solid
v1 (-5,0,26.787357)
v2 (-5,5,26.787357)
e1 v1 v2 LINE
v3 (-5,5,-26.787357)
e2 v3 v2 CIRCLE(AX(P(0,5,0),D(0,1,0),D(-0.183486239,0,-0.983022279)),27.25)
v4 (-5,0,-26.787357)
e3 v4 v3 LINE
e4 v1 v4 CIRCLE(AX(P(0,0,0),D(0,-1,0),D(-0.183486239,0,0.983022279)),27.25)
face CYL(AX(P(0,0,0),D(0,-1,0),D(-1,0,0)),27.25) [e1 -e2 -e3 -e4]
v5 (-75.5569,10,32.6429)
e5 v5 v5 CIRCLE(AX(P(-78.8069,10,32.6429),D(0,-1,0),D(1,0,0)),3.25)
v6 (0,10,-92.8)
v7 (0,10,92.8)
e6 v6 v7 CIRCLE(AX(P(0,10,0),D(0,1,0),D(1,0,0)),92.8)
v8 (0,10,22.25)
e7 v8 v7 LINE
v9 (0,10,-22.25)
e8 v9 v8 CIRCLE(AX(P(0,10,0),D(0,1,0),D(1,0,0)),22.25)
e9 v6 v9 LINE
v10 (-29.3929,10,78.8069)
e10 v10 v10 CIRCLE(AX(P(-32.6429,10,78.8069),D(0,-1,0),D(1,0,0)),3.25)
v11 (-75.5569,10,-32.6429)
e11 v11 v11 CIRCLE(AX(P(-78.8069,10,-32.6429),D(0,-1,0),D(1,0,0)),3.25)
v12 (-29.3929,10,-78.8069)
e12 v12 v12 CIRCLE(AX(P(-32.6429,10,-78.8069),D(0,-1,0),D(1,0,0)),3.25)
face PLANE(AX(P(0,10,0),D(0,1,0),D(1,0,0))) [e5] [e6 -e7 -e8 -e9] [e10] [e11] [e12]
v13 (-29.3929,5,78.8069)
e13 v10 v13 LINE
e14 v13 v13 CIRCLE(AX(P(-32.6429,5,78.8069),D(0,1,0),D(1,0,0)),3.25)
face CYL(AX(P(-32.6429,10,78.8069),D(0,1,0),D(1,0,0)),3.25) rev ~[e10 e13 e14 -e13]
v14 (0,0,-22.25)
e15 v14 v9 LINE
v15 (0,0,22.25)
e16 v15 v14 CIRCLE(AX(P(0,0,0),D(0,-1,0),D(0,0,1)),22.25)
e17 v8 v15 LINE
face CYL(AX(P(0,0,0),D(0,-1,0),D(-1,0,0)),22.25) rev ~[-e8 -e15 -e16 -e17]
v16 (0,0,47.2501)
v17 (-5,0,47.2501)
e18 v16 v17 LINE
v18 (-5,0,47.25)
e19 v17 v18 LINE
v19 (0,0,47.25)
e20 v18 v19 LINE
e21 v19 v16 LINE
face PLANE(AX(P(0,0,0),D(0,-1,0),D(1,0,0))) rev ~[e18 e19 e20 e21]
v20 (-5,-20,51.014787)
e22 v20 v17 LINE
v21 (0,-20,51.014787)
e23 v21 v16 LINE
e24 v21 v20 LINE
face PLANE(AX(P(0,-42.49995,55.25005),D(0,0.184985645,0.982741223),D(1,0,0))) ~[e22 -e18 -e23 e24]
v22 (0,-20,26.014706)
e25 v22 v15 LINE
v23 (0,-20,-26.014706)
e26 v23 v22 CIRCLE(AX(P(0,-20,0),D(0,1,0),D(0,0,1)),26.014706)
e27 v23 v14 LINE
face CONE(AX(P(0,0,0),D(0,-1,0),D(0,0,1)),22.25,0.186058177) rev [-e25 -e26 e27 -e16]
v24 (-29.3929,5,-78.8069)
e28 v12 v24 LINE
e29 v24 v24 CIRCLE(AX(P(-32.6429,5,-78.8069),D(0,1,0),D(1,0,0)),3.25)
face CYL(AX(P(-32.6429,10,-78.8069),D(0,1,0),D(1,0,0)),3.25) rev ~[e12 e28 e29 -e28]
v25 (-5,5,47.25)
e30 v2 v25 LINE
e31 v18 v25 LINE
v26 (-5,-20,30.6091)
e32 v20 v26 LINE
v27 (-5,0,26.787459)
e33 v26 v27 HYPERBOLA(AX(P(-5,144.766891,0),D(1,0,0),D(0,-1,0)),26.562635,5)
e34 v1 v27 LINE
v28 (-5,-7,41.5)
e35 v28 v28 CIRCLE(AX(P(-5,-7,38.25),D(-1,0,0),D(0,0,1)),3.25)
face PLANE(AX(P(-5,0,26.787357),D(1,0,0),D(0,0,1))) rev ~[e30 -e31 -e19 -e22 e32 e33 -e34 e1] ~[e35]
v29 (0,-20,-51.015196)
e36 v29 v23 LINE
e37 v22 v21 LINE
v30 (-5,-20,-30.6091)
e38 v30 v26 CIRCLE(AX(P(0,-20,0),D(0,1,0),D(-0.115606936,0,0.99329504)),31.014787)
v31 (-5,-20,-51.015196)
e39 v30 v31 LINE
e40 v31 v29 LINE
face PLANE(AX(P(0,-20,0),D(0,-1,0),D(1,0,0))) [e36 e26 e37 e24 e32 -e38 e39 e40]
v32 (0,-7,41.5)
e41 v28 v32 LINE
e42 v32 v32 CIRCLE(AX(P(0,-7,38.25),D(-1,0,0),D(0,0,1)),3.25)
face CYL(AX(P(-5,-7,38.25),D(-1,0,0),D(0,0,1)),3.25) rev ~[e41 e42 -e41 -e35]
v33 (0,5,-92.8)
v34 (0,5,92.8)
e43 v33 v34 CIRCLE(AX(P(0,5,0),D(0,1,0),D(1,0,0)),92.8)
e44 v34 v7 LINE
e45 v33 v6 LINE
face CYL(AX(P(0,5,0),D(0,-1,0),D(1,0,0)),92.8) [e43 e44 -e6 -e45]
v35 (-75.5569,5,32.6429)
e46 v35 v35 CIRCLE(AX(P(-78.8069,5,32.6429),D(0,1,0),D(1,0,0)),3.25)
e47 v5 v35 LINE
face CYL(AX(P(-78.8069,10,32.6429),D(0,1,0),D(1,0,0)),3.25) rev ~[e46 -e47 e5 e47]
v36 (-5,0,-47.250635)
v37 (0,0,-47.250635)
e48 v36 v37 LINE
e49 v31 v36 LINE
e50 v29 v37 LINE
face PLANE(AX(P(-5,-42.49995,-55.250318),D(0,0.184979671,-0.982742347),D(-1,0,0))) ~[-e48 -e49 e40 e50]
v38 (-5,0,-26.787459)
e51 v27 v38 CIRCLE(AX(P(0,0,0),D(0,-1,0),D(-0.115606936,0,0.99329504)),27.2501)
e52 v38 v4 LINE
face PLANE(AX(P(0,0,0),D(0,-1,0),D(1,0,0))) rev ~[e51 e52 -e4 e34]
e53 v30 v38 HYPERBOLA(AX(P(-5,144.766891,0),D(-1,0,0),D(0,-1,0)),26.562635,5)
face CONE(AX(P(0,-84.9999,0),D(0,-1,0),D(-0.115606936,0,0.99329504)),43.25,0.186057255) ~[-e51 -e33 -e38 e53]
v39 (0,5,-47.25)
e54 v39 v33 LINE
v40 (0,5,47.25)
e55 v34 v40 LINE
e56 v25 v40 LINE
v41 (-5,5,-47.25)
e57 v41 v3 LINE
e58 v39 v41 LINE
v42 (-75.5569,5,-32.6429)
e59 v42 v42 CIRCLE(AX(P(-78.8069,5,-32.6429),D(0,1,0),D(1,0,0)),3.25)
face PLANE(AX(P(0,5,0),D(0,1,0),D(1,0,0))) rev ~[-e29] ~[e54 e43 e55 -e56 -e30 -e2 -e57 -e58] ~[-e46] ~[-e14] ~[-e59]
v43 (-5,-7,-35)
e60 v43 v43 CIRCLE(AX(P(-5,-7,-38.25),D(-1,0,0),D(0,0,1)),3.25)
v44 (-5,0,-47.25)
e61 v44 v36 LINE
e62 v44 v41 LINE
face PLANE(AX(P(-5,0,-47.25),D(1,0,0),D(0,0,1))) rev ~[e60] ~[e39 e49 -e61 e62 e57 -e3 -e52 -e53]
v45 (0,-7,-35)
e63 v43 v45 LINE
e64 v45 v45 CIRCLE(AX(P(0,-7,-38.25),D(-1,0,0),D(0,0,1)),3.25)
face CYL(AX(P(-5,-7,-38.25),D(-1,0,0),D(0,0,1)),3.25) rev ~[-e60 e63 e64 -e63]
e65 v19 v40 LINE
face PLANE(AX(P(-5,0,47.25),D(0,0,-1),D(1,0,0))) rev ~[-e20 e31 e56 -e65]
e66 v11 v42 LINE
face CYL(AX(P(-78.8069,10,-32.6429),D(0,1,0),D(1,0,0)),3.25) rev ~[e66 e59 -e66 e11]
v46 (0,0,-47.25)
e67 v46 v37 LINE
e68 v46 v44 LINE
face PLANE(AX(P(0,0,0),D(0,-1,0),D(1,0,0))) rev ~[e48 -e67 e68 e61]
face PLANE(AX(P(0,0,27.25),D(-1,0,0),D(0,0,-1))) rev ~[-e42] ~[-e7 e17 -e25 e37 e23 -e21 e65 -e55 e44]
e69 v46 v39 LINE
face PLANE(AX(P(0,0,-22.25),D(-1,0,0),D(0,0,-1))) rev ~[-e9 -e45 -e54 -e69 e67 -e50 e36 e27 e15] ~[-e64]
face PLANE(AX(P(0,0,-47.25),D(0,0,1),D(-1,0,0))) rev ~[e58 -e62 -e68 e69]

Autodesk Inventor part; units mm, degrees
ref_plane "YZ Plane" through (0, 0, 0) normal (1, 0, 0) x (0, 1, 0)
ref_plane "XZ Plane" through (0, 0, 0) normal (0, 1, 0) x (-1, 0, 0)
ref_plane "XY Plane" through (0, 0, 0) normal (0, 0, 1) x (1, 0, 0)
sketch "Skizze1" plane through (0, 0, 0) normal (0, 1, 0) x (-1, 0, 0)
  circle A0 centre (0, 0) radius 22.25
  circle A1 centre (0, 0) radius 27.25
  line L0 (5, 47.25) -> (-5, 47.25)
  line L1 (-5, 47.25) -> (-5, -47.25)
  line L2 (-5, -47.25) -> (5, -47.25)
  line L3 (5, -47.25) -> (5, 47.25)
  line L4 (5, 47.25) -> (-5, -47.25) construction
  line L5 (-5, 47.25) -> (5, -47.25) construction
  line L6 (0, 47.25) -> (0, -47.25)
  point P0 (0, 22.25)
  point P1 (0, -22.25)
  point P2 (5, -26.7874)
  point P3 (5, 26.7874)
  dimension "d0" = 44.5
  dimension "d1" = 54.5
  dimension "d2" = 10
  dimension "d3" = 94.5
extrude "Extrusion1" add sketch "Skizze1" along normal blind 5 contours A0 L3 A1 | A0 L6 A1 L3 | L3 A1 L6 A0 | A1 L6 L0 L3 | L3 L2 L6 A1
sketch "Skizze4" plane through (0, 5, 0) normal (0, 1, 0) x (1, 0, 0)
  circle A0 centre (0, 0) radius 22.25
  circle A1 centre (0, 0) radius 92.8
  circle A2 centre (0, 0) radius 72.8
  line L0 (0, -92.8) -> (0, 92.8)
  point P0 (0, 22.25)
  point P1 (0, -22.25)
  dimension "d23" = 185.6
  dimension "d24" = 145.6
  dimension "d43" = 44.5
extrude "Extrusion4" add sketch "Skizze4" along normal blind 5 contours A0 L0 A2 | A2 L0 A1 picked at (-55.7302, 0.894) picked at (-74.476, -42.8466)
sketch "Skizze5" plane through (0, 10, 0) normal (0, 1, 0) x (1, 0, 0)
  circle A0 centre (0, 0) radius 52.8
  arc A1 (0, 92.8) -> (0, -92.8) centre (0, 0) ccw projected
  line L0 (0, 0) -> (72.8, 0) construction
  line L1 (0, 0) -> (72.8, 0) construction
  circle A2 centre (0, 0) radius 85.3
  line L2 (0, 0) -> (-35.513, 85.736)
  line L3 (0, 0) -> (92.8, 0) construction
  line L4 (0, 0) -> (-85.736, 35.513)
  line L5 (0, 0) -> (92.8, 0) construction
  line L6 (0, 0) -> (-35.513, -85.736)
  line L7 (0, 0) -> (92.8, 0) construction
  line L8 (0, 0) -> (-85.736, -35.513)
  line L9 (0, 0) -> (92.8, 0) construction
  circle A3 centre (-32.6429, -78.8069) radius 3.25
  circle A4 centre (-78.8069, -32.6429) radius 3.25
  circle A5 centre (-78.8069, 32.6429) radius 3.25
  circle A6 centre (-32.6429, 78.8069) radius 3.25
  circle A7 centre (0, 0) radius 77.8
  dimension "d27" = 105.6
  dimension "d31" = 170.6
  dimension "d32" = 112.5
  dimension "d33" = 157.5
  dimension "d34" = 112.5
  dimension "d35" = 157.5
  dimension "d36" = 6.5
  dimension "d37" = 6.5
  dimension "d38" = 6.5
  dimension "d39" = 6.5
  dimension "d42" = 155.6
extrude "Extrusion5" cut sketch "Skizze5" against normal through all contours A6 A2 L2 | L2 A2 A6 | A3 A2 L6 | L6 A2 A3 | A5 A2 L4 | L4 A2 A5 | L2 A6 A2 | A2 A6 L2 | A4 A2 L8 | L8 A2 A4 | L6 A3 A2 | A2 A3 L6 | L4 A5 A2 | A2 A5 L4 | L8 A4 A2 | A2 A4 L8
sketch "Skizze6" plane through (0, 0, 0) normal (0, -1, 0) x (1, 0, 0)
  circle A0 centre (0, 0) radius 38.25
  line L0 (5, 63.25) -> (-5, 63.25)
  line L1 (-5, 63.25) -> (-5, -63.25)
  line L2 (-5, -63.25) -> (5, -63.25)
  line L3 (5, -63.25) -> (5, 63.25)
  line L4 (5, 63.25) -> (-5, -63.25) construction
  line L5 (-5, 63.25) -> (5, -63.25) construction
  circle A1 centre (0, 0) radius 43.25
  circle A2 centre (0, 0) radius 22.25
  line L6 (0, -47.25) -> (0, -92.8) projected
  line L7 (0, -63.25) -> (0, 63.25)
  point P0 (-5, 42.96)
  point P1 (-5, -42.96)
  point P2 (0, -22.25)
  point P3 (0, 22.25)
  dimension "d44" = 76.5
  dimension "d45" = 10
  dimension "d46" = 126.5
  dimension "d47" = 86.5
extrude "Extrusion6" add sketch "Skizze6" along normal blind 85 contours L7 A2 L1 A0 | A0 L1 A1 L7 | L7 A1 L1 A0 | A0 L1 A2 L7 | L1 A2 A0 | A0 L1 A1 | A1 L1 L0 L7 | L7 L6 L2 L1 A1
chamfer "Fasen1" distance 16 distance2 85 1 edges at (-22.25, -85, 0) measured on face at (-1.6667, -85, -42.82)
chamfer "Fasen2" distance 85 angle 10.66 1 edges at (-2.5, 0, -63.25) measured on face at (-3.3333, -28.3333, -63.25)
chamfer "Fasen3" distance 85 distance2 16 1 edges at (-2.5, 0, 63.25) measured on face at (-1.6667, -28.3333, 63.25)
chamfer "Fasen4" distance 85 distance2 16 1 edges at (-43.25, 0, 0) measured on face at (-38.2627, -56.6667, -20.1626)
sketch "Skizze7" plane through (0, -85, 0) normal (0, -1, 0) x (1, 0, 0)
  circle A0 centre (0, 0) radius 65
  dimension "d62" = 130
extrude "Extrusion7" cut sketch "Skizze7" against normal blind 65
sketch "Skizze8" plane through (-5, 5, -47.25) normal (-1, 0, 0) x (0, 0, 1)
  circle A0 centre (9, -12) radius 3.25
  line L0 (-3.7651, -25) -> (16.641, -25) projected
  line L1 (0, -5) -> (0, 0) projected
  point P0 (47.25, -5)
  dimension "d65" = 6.5
  dimension "d66" = 13
  dimension "d67" = 9
sketch "Skizze9" plane through (-5, 5, 26.7874) normal (-1, 0, 0) x (0, 0, 1)
  circle A0 centre (11.4626, -12) radius 3.25
  line L0 (3.8217, -25) -> (24.2273, -25) projected
  line L1 (20.4626, -5) -> (20.4626, 0) projected
  point P0 (-26.7874, -5)
  dimension "d68" = 6.5
  dimension "d69" = 13
  dimension "d70" = 9
extrude "Extrusion8" cut sketch "Skizze8" against normal through all
extrude "Extrusion9" cut sketch "Skizze9" against normal through all
properties part number "rohr-mount-v2"
